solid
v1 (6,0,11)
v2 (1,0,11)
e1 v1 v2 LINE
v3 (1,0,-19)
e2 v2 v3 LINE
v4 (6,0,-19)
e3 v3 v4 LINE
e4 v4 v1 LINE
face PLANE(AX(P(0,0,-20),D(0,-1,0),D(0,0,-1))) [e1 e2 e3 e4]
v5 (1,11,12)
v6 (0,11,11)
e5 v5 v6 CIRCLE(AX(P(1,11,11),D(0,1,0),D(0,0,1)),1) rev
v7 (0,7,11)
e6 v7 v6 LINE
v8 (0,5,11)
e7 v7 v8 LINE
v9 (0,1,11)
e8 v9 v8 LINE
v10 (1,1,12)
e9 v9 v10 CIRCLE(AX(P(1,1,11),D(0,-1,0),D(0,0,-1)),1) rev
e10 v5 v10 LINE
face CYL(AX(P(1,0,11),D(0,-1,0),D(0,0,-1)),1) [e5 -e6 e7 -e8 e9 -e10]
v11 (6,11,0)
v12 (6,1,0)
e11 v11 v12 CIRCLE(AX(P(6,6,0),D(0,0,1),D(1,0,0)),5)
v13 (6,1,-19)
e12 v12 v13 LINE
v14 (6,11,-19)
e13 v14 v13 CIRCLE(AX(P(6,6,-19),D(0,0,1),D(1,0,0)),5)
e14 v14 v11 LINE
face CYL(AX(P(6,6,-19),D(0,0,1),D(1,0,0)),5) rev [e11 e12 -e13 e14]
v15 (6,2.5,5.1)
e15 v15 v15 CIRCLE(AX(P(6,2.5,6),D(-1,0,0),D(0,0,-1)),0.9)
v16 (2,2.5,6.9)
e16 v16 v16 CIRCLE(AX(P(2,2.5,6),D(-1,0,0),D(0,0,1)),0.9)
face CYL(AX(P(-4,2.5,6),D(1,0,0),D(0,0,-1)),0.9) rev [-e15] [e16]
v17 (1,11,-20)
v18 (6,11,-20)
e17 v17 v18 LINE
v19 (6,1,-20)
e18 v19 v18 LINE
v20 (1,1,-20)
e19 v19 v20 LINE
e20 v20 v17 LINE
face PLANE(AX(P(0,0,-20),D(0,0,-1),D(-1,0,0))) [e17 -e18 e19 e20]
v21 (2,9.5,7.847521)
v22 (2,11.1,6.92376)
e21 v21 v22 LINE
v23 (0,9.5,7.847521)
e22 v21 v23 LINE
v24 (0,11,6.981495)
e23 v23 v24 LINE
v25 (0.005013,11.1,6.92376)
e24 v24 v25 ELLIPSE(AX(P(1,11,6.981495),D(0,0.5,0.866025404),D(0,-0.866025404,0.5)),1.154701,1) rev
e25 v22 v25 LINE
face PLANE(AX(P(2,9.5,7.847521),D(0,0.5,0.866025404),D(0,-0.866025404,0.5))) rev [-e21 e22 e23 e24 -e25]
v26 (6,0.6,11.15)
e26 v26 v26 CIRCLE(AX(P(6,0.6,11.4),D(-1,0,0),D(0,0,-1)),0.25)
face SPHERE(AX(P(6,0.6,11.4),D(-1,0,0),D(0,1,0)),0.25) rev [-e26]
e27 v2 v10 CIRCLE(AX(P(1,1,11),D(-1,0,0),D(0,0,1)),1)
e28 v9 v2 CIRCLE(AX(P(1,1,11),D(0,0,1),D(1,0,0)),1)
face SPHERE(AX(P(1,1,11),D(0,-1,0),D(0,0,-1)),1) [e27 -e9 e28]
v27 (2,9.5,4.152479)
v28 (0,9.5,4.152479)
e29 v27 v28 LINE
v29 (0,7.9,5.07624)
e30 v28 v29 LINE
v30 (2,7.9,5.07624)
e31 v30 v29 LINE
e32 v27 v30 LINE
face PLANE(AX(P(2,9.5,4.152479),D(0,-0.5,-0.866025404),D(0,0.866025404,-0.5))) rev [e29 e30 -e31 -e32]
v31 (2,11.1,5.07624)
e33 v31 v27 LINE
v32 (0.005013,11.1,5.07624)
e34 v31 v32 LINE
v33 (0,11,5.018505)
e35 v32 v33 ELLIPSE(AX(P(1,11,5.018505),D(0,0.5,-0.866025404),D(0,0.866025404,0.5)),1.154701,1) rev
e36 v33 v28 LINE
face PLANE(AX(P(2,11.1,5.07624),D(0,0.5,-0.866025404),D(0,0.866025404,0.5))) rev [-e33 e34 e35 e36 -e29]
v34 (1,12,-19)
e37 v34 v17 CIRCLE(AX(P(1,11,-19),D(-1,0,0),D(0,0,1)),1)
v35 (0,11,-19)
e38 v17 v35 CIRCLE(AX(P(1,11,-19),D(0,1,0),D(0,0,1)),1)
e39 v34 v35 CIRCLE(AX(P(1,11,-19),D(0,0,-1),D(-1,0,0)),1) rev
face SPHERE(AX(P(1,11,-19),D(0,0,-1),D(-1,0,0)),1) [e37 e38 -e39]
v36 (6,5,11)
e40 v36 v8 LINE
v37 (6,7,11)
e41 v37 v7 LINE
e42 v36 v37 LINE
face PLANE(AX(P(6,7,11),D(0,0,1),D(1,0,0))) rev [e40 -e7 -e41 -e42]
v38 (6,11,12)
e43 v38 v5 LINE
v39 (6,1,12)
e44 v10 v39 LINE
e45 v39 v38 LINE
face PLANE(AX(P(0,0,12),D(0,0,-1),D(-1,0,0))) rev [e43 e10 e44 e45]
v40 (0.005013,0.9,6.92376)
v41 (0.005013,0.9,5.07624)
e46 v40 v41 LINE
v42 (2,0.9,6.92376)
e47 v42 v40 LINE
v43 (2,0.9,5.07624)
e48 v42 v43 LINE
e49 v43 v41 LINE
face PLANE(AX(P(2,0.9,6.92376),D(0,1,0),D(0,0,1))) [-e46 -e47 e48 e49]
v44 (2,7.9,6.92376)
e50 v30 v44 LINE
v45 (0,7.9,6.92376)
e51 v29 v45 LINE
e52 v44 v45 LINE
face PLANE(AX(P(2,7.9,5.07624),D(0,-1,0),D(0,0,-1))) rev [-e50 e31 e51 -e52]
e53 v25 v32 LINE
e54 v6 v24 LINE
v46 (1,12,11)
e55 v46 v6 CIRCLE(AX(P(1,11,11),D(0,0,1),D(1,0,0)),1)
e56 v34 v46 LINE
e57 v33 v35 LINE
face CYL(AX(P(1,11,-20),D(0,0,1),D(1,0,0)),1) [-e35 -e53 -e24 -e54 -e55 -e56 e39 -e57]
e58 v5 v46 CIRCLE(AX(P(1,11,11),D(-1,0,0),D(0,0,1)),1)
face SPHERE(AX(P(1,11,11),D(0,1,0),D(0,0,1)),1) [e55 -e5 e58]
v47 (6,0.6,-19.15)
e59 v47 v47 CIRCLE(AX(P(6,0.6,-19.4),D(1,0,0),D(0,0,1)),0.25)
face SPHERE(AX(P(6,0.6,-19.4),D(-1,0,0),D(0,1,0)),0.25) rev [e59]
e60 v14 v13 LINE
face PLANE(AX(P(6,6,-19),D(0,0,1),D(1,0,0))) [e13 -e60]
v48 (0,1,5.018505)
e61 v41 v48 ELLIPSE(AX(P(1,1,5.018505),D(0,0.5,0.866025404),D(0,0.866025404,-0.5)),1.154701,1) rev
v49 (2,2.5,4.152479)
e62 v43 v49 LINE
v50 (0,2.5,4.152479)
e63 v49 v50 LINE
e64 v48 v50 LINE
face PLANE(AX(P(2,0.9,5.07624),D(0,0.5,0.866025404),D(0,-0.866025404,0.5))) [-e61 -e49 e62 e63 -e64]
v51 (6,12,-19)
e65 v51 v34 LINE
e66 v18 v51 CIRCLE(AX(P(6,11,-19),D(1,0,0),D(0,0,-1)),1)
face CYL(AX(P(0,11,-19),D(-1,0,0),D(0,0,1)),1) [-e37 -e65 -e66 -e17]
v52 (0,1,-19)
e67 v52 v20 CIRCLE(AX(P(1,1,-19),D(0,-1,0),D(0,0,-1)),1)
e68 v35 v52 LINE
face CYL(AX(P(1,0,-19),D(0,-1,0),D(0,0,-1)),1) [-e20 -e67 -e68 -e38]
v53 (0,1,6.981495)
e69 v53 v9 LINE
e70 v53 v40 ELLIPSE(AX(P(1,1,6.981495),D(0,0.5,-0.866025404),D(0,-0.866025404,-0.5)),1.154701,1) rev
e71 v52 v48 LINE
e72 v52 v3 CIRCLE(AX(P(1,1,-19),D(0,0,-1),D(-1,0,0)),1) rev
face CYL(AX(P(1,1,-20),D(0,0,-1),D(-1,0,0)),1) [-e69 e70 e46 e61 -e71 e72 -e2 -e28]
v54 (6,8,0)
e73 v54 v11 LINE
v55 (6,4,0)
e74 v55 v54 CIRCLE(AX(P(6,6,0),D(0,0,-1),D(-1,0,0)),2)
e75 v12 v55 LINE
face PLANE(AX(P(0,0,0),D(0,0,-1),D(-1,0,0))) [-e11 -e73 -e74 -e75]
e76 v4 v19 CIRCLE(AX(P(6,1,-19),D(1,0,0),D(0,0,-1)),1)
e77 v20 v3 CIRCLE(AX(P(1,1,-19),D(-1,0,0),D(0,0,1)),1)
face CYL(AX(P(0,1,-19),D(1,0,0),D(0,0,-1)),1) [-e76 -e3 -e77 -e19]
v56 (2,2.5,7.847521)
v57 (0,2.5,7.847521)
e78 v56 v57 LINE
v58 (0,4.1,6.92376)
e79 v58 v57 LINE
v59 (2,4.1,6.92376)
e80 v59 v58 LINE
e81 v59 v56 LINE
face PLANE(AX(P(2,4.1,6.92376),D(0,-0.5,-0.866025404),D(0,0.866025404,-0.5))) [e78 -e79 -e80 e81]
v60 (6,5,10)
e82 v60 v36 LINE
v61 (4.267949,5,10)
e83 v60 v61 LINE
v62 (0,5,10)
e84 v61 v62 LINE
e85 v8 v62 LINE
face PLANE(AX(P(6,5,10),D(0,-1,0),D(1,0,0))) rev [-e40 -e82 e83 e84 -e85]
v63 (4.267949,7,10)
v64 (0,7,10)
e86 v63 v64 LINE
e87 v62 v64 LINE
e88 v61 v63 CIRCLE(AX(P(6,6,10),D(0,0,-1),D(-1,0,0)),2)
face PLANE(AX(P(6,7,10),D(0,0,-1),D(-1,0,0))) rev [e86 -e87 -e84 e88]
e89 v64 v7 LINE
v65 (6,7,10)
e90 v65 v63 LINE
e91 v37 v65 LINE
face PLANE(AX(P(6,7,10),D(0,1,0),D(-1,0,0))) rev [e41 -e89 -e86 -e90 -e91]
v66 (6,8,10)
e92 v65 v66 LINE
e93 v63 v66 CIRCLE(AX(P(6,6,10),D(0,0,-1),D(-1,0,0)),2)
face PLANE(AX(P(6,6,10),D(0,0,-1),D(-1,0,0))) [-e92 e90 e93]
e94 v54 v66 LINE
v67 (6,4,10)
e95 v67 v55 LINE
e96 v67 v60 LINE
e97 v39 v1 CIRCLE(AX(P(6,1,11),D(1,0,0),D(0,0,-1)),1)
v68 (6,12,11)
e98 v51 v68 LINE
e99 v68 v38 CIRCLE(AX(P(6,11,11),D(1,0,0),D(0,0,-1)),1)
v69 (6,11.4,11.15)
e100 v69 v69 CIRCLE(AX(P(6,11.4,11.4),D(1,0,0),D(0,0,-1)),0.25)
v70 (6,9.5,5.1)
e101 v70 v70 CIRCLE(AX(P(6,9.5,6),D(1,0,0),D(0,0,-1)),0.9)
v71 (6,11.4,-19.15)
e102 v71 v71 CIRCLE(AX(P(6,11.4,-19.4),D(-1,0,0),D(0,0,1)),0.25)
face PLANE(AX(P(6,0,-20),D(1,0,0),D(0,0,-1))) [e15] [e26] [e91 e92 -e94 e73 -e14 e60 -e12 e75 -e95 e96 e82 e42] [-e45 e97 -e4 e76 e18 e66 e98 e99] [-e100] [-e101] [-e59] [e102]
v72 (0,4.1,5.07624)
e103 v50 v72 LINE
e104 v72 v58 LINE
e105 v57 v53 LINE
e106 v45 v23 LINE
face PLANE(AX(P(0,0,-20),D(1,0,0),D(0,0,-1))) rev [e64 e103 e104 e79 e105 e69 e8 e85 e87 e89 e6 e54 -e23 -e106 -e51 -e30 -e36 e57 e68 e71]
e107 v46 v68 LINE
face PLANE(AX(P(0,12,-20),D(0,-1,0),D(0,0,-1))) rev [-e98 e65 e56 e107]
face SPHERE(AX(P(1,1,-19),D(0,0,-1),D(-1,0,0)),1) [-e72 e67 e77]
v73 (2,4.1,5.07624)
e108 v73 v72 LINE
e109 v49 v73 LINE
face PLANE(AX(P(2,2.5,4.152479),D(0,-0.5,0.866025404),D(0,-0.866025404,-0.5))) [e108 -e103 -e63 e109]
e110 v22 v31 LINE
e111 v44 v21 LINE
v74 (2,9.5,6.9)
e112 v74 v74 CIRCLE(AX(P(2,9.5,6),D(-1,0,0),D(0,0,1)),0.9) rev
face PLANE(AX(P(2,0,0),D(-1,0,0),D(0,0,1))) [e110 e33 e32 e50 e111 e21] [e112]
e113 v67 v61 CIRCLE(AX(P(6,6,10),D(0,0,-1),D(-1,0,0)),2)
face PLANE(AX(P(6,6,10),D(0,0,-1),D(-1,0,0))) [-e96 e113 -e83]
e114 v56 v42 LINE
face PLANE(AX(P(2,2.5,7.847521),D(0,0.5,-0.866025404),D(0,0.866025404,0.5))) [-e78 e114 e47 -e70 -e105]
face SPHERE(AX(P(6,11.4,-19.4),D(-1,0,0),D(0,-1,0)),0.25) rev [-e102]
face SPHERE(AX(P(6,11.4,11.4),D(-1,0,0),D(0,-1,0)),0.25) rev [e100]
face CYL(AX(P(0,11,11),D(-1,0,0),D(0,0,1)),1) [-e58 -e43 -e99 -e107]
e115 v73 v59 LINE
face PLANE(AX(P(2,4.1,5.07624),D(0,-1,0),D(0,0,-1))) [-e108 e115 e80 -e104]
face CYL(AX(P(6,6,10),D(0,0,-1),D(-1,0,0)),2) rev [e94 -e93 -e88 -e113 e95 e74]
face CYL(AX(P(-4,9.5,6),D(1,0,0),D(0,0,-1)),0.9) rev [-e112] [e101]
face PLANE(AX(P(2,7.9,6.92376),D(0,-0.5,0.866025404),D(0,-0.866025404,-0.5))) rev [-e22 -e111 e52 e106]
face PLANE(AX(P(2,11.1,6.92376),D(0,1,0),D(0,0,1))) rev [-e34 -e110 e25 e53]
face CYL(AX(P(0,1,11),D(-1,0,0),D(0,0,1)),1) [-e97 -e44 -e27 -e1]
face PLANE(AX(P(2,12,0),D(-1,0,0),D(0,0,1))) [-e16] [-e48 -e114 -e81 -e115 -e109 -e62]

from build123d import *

# Parameters (mm, degrees)
SKETCH1_W               = 6
SKETCH1_H               = 12
BOSS_EXTRUDE1_DEPTH     = 20
SKETCH2_R               = 5
CUT_EXTRUDE1_DEPTH      = 19
SKETCH6_W               = 6
SKETCH6_H               = 12
BOSS_EXTRUDE3_DEPTH     = 12
SKETCH7_R               = 2
CUT_EXTRUDE2_DEPTH      = 10
CUT_EXTRUDE3_DEPTH      = 25.083189158
CUT_EXTRUDE3_DEPTH_BACK = 25.083189158
SKETCH8_W               = 1
SKETCH8_H               = 2
FILLET1_R               = 1
SKETCH10_R              = 0.9
CUT_EXTRUDE4_DEPTH      = 10
CUT_EXTRUDE5_DEPTH      = 2


with BuildPart() as part:
    # Sketch1 → Boss-Extrude1 (new body)
    with BuildSketch(Plane.XY):
        with Locations((3, 6)):
            Rectangle(SKETCH1_W, SKETCH1_H)
    extrude(amount=-BOSS_EXTRUDE1_DEPTH)

    # Sketch2 → Cut-Extrude1 (cut)
    with BuildSketch(Plane.XY):
        with Locations((6, 6)):
            Circle(SKETCH2_R)
    extrude(amount=-CUT_EXTRUDE1_DEPTH, mode=Mode.SUBTRACT)

    # Sketch6 → Boss-Extrude3 (add)
    with BuildSketch(Plane.XY):
        with Locations((3, 6)):
            Rectangle(SKETCH6_W, SKETCH6_H)
    extrude(amount=BOSS_EXTRUDE3_DEPTH)

    # Sketch7 → Cut-Extrude2 (cut)
    with BuildSketch(Plane(origin=(0, 0, 0), x_dir=(-1, 0, 0), z_dir=(0, 0, -1))):
        with Locations((-6, 6)):
            Circle(SKETCH7_R)
    extrude(amount=-CUT_EXTRUDE2_DEPTH, mode=Mode.SUBTRACT)

    # Sketch8 → Cut-Extrude3 (cut, two sides: drawn at the far end of the back side and taken through both)
    with BuildSketch(Plane.ZY.offset(-CUT_EXTRUDE3_DEPTH_BACK)):
        with Locations((10.5, 6)):
            Rectangle(SKETCH8_W, SKETCH8_H)
    extrude(amount=CUT_EXTRUDE3_DEPTH + CUT_EXTRUDE3_DEPTH_BACK, mode=Mode.SUBTRACT)

    # Fillet1
    fillet1_edges = [part.edges().sort_by_distance(p)[0] for p in [
        (3, 0, -20),
        (3, 12, 12),
        (0, 6, 12),
        (3, 0, 12),
        (0, 6, -20),
        (0, 0, -4),
        (0, 12, -4),
        (3, 12, -20),
    ]]
    fillet(fillet1_edges, radius=FILLET1_R - 0.0001)  # a hair under: the kernel refuses the full size

    # Sketch10 → Cut-Extrude4 (cut)
    with BuildSketch(Plane(origin=(6, 0, 0), x_dir=(0, 0, -1), z_dir=(1, 0, 0))):
        with Locations((-6, 9.5)):
            Circle(SKETCH10_R)
    cut_extrude4 = extrude(amount=-CUT_EXTRUDE4_DEPTH, mode=Mode.SUBTRACT)

    # Sketch12 → Cut-Extrude5 (cut)
    with BuildSketch(Plane.ZY):
        Polygon((6.923760431, 7.9), (7.847520861, 9.5), (6.923760431, 11.1), (5.076239569, 11.1), (4.152479139, 9.5), (5.076239569, 7.9), align=None)
    cut_extrude5 = extrude(amount=-CUT_EXTRUDE5_DEPTH, mode=Mode.SUBTRACT)

    # Mirror1: Cut-Extrude4, Cut-Extrude5 across plane
    add(cut_extrude4.mirror(Plane.ZX.offset(6)), mode=Mode.SUBTRACT)
    add(cut_extrude5.mirror(Plane.ZX.offset(6)), mode=Mode.SUBTRACT)

    # Sketch11 → Cut-Revolve1 (revolve, cut)
    with BuildSketch(Plane(origin=(0, 0, -19.4), x_dir=(-1, 0, 0), z_dir=(0, 0, -1))):
        with BuildLine():
            Line((-5.75, 11.4), (-6, 11.4))
            Line((-6, 11.4), (-6, 11.15))
            ThreePointArc((-6, 11.15), (-5.823223305, 11.223223305), (-5.75, 11.4))
        make_face()
    cut_revolve1 = revolve(axis=Axis((5.75, 11.4, -19.4), (1, 0, 0)), mode=Mode.SUBTRACT)

    # Mirror2: Cut-Revolve1 across plane
    add(cut_revolve1.mirror(Plane.ZX.offset(6)), mode=Mode.SUBTRACT)

    # Mirror2 at the second plane: Cut-Revolve1 across plane
    add(cut_revolve1.mirror(Plane.XY.offset(-4)), mode=Mode.SUBTRACT)

    # Mirror2 at the second plane copy 1 sketc → Mirror2 at the second plane copy 1 (revolve, cut)
    with BuildSketch(Plane(origin=(0, 12, 11.4), x_dir=(-1, 0, 0), z_dir=(0, 0, 1))):
        with BuildLine():
            Line((-5.75, 11.4), (-6, 11.4))
            Line((-6, 11.4), (-6, 11.15))
            ThreePointArc((-6, 11.15), (-5.823223305, 11.223223305), (-5.75, 11.4))
        make_face()
    revolve(axis=Axis((5.75, 0.6, 11.4), (1, 0, 0)), mode=Mode.SUBTRACT)


solid = part.part
